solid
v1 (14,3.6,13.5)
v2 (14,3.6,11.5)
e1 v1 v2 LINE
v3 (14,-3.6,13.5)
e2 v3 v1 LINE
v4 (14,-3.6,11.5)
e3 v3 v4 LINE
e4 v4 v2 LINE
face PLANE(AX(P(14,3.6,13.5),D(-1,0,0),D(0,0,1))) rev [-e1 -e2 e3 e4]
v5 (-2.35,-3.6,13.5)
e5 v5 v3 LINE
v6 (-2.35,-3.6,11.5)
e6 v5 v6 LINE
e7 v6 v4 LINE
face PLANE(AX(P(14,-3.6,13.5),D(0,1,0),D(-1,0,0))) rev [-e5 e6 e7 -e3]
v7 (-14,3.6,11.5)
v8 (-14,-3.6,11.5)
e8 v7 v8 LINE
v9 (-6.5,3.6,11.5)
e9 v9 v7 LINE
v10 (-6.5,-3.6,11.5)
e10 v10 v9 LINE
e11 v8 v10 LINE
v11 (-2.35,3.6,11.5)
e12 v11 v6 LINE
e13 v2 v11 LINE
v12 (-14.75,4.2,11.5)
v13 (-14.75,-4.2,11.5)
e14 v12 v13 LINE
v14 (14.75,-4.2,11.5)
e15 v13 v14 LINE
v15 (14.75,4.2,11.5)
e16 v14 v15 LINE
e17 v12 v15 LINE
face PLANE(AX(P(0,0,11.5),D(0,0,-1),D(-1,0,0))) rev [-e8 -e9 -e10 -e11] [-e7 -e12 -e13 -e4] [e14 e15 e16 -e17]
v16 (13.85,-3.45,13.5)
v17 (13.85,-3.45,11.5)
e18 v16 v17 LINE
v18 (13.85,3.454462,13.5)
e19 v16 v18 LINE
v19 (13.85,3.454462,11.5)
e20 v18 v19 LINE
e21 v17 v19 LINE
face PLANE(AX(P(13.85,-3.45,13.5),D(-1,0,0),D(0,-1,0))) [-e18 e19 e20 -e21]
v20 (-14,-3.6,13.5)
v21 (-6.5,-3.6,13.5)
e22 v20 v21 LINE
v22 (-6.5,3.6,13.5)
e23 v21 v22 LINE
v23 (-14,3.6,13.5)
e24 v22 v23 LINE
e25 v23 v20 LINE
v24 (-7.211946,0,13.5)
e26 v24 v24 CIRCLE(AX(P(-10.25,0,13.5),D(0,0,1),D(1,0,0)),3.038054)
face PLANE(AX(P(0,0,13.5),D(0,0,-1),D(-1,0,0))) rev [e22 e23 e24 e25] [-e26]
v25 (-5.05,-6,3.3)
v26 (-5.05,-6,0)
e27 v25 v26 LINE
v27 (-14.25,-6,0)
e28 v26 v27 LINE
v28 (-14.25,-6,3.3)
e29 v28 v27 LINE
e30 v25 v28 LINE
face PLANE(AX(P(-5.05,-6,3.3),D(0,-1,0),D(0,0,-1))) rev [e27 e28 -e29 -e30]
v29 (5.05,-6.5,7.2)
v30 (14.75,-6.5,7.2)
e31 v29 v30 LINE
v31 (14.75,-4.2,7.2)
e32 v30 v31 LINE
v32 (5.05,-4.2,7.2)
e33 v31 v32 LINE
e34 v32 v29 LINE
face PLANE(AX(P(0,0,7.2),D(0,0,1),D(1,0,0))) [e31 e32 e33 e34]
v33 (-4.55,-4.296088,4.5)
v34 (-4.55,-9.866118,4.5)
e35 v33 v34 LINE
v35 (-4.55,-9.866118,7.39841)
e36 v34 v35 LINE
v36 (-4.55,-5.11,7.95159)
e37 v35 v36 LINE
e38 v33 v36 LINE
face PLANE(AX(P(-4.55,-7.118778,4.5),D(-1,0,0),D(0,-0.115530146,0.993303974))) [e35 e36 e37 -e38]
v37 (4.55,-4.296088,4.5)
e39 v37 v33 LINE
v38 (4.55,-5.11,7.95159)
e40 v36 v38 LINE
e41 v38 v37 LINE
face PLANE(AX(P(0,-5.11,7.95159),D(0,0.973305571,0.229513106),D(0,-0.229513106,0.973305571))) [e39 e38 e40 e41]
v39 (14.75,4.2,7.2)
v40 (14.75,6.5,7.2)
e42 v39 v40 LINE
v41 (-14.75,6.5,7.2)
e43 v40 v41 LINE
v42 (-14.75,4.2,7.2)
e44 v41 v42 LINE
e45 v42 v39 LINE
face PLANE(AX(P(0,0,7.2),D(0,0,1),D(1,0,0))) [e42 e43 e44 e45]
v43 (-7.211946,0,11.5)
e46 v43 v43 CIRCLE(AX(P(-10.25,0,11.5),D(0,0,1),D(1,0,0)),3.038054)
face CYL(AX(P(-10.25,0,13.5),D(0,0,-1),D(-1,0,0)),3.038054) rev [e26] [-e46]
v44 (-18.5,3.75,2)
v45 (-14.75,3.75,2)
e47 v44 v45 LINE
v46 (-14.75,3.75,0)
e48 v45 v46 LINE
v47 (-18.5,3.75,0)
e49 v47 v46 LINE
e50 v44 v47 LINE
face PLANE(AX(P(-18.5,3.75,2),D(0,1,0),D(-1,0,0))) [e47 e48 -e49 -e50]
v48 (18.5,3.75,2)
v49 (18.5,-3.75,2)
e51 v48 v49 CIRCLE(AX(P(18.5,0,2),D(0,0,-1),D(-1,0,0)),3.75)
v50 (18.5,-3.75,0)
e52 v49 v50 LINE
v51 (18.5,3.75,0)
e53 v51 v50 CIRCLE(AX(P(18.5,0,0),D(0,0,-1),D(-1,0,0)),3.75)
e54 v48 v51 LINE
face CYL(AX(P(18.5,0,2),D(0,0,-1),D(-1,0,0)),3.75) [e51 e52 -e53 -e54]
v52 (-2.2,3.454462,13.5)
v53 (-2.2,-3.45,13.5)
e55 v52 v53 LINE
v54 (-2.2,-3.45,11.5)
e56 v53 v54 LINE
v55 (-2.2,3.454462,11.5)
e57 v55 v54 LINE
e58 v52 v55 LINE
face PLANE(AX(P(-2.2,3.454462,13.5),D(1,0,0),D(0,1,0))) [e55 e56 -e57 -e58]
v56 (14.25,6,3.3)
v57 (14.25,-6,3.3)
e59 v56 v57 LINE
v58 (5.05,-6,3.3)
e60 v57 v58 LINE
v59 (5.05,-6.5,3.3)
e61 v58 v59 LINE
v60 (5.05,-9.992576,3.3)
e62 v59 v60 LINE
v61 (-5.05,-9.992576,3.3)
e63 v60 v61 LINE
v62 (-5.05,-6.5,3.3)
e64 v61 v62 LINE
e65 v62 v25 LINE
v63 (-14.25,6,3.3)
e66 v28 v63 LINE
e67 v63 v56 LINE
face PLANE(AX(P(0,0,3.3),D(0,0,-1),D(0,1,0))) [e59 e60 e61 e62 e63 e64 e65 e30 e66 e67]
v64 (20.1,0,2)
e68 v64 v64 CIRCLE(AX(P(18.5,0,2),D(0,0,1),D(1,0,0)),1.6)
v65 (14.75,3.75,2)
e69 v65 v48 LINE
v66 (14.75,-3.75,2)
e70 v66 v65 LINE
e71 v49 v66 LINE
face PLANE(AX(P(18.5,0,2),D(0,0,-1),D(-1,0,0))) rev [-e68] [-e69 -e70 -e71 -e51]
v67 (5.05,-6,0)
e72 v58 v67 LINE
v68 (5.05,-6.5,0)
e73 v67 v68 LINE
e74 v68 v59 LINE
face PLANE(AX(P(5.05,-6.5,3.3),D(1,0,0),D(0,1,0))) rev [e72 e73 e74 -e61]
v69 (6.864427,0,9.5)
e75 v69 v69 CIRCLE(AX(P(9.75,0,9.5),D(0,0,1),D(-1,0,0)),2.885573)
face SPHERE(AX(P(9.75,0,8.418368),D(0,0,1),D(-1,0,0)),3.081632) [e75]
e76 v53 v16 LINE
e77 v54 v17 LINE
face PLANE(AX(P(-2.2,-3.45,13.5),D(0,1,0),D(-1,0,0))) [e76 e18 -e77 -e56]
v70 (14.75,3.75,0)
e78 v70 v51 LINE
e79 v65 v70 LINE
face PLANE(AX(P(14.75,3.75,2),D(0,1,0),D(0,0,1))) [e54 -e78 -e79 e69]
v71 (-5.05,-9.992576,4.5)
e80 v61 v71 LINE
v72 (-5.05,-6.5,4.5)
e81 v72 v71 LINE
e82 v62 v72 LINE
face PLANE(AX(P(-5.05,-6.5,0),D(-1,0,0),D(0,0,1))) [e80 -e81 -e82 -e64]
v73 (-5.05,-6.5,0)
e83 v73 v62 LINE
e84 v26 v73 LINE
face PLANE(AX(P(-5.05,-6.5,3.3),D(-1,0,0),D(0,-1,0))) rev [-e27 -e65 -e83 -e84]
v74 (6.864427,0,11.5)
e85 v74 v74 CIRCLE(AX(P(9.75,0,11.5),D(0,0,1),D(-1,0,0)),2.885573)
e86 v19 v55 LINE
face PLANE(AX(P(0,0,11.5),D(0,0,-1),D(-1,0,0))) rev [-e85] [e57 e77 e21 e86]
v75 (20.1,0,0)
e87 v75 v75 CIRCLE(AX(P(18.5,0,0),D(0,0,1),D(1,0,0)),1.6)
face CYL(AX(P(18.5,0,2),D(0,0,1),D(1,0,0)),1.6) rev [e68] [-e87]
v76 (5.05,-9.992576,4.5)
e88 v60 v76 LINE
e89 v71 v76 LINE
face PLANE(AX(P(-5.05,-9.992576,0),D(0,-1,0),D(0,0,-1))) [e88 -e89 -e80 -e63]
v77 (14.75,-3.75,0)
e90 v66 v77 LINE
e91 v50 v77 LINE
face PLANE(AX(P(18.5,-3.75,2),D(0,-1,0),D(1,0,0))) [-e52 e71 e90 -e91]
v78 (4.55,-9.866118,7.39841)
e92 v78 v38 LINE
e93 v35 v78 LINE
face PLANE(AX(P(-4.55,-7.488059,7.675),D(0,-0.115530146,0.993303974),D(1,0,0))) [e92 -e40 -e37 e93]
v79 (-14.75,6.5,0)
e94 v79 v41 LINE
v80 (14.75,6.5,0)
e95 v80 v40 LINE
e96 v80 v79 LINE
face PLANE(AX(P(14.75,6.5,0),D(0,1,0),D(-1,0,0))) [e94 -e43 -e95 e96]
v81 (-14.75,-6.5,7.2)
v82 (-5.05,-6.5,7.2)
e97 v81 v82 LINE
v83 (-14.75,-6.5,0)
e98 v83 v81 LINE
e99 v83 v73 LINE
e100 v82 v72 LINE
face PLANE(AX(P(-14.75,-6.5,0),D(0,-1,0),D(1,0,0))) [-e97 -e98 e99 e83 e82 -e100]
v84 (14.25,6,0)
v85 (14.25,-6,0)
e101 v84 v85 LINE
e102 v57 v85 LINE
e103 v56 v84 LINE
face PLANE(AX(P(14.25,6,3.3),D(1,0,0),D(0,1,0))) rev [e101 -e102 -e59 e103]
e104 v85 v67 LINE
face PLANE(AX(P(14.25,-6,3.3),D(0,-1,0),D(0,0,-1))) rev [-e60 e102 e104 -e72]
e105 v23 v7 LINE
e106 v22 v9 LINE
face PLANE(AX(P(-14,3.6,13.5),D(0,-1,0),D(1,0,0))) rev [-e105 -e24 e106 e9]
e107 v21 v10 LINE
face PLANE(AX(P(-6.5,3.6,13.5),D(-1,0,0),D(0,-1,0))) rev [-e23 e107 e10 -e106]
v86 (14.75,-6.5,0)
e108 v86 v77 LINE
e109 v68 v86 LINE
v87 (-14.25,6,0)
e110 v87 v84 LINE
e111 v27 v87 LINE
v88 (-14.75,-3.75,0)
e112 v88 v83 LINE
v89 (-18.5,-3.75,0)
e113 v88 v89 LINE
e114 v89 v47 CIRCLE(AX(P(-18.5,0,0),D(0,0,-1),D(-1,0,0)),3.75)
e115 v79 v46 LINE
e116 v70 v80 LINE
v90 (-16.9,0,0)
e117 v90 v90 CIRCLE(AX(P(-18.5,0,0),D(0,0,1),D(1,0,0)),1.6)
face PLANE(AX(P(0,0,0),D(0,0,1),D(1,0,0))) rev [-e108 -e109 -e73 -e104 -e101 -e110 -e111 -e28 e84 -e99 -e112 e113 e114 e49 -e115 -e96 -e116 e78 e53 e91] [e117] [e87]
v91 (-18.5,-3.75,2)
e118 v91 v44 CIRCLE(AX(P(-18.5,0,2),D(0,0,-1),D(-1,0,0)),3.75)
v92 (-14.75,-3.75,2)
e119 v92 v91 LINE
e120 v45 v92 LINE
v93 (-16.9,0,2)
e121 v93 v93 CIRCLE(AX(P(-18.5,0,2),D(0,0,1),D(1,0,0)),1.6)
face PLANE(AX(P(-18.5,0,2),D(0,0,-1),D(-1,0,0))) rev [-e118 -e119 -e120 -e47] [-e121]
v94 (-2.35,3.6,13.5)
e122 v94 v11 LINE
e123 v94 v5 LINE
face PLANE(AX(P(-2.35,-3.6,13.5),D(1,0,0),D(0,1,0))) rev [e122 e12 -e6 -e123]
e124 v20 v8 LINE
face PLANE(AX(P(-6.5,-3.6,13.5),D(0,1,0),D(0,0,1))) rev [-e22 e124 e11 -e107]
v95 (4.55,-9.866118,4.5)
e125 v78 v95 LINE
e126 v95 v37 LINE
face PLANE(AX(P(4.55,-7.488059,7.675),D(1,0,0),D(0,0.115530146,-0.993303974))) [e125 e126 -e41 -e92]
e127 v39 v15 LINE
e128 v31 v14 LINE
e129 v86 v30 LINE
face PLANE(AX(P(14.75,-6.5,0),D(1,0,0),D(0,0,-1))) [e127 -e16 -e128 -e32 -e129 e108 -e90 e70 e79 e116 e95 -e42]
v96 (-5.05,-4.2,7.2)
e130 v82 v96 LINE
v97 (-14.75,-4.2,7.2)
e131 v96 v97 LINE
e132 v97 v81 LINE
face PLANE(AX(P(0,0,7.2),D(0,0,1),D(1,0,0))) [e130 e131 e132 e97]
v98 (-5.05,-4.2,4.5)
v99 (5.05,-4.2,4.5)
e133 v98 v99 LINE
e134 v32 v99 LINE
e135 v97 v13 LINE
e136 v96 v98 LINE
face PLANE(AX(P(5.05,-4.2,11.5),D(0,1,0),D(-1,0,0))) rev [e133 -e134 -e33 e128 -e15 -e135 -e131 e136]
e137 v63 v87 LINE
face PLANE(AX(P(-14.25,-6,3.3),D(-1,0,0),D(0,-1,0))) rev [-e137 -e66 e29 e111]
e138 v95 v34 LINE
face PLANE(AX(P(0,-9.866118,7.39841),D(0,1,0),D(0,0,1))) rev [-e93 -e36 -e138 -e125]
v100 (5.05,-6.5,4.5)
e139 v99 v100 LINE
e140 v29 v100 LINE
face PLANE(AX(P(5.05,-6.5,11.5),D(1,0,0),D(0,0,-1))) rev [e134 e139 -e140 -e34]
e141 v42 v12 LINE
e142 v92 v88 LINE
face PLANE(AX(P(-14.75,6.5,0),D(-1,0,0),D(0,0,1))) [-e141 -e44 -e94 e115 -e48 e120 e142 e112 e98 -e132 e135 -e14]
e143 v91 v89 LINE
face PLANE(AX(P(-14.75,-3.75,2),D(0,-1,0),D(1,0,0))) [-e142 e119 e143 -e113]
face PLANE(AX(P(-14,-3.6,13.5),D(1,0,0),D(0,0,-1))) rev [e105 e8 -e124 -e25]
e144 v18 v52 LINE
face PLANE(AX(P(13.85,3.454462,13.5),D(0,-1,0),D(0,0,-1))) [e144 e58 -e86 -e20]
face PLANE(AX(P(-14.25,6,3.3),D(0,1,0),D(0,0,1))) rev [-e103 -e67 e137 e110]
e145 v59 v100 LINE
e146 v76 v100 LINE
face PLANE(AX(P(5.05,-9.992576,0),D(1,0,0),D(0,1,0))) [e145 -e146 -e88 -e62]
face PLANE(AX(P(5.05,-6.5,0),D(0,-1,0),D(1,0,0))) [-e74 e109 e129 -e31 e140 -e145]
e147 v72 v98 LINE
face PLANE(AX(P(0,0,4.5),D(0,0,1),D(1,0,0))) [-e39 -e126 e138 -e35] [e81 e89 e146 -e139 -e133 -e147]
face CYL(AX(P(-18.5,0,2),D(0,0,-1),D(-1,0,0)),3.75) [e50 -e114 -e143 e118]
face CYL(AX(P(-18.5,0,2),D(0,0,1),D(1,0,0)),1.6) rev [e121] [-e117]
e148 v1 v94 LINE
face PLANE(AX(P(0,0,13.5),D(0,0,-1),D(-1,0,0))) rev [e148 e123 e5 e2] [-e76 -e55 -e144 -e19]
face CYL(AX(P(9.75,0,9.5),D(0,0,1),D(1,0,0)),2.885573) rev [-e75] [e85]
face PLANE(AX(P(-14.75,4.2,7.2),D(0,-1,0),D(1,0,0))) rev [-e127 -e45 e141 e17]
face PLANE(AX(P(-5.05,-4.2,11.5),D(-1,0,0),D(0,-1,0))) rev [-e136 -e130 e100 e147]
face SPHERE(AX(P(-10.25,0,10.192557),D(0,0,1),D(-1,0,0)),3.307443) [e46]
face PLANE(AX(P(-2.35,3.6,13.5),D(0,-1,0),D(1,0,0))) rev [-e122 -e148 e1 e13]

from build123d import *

# Parameters (mm, degrees)
ESTRUSIONE_ESTRUSIONE1_DEPTH = 4.5
NERVATURA1_START             = -4.55
NERVATURA1_DEPTH             = 9.1
ESTRUSIONE_ESTRUSIONE2_DEPTH = 7
TAGLIO_ESTRUSIONE1_DEPTH     = 3.3
ESTRUSIONE_ESTRUSIONE3_DEPTH = 2
FORO1_D                      = 3.2
FORO2_D                      = 3.2
SCHIZZO10_W                  = 29.5
SCHIZZO10_H                  = 2.3
SCHIZZO10_W_2                = 9.7
TAGLIO_ESTRUSIONE2_DEPTH     = 4.3
SCHIZZO11_W                  = 16.35
SCHIZZO11_H                  = 7.2
SCHIZZO11_W_2                = 16.05
SCHIZZO11_H_2                = 6.904461538
ESTRUSIONE_ESTRUSIONE4_DEPTH = 2
SCHIZZO12_R                  = 2.885572668
TAGLIO_ESTRUSIONE3_DEPTH     = 2
SCHIZZO15_W                  = 7.5
SCHIZZO15_H                  = 7.2
SCHIZZO15_R                  = 3.038054308
ESTRUSIONE_ESTRUSIONE5_DEPTH = 2


# Read off the part's stored shape, not the designer's step: Nervatura1
with BuildPart() as part:
    # Schizzo1 → Estrusione-Estrusione1 (new body)
    with BuildSketch(Plane.XY.offset(4.5)):
        Polygon((5.05, -9.992575631), (5.05, -6.5), (14.75, -6.5), (14.75, 6.5), (-14.75, 6.5), (-14.75, -6.5), (-5.05, -6.5), (-5.05, -9.992575631), align=None)
    extrude(amount=-ESTRUSIONE_ESTRUSIONE1_DEPTH)

    # Nervatura1 outline → Nervatura1 (add)
    with BuildSketch(Plane.YZ.offset(NERVATURA1_START)):
        Polygon((-4.296088186, 4.5), (-5.110000145, 7.951589572), (-9.866118458, 7.398410428), (-9.866118458, 4.5), align=None)
    extrude(amount=NERVATURA1_DEPTH)

    # Schizzo3 → Estrusione-Estrusione2 (add)
    with BuildSketch(Plane.XY.offset(4.5)):
        Polygon((-14.75, -6.5), (-14.75, 6.5), (14.75, 6.5), (14.75, -6.5), (5.05, -6.5), (5.05, -4.2), (-5.05, -4.2), (-5.05, -6.5), align=None)
    extrude(amount=ESTRUSIONE_ESTRUSIONE2_DEPTH)

    # Schizzo4 → Taglio-Estrusione1 (cut)
    with BuildSketch(Plane(origin=(0, 0, 0), x_dir=(-1, 0, 0), z_dir=(0, 0, -1))):
        Polygon((5.05, -9.992575631), (5.05, -6.5), (5.05, -6), (14.25, -6), (14.25, 6), (-14.25, 6), (-14.25, -6), (-5.05, -6), (-5.05, -6.5), (-5.05, -9.992575631), align=None)
    extrude(amount=-TAGLIO_ESTRUSIONE1_DEPTH, mode=Mode.SUBTRACT)

    # Schizzo5 → Estrusione-Estrusione3 (add)
    with BuildSketch(Plane(origin=(0, 0, 0), x_dir=(-1, 0, 0), z_dir=(0, 0, -1))):
        with BuildLine():
            Line((14.75, 3.75), (14.75, -3.75))
            Line((14.75, -3.75), (18.5, -3.75))
            ThreePointArc((18.5, -3.75), (22.25, 0), (18.5, 3.75))
            Line((18.5, 3.75), (14.75, 3.75))
        make_face()
        with BuildLine():
            Line((-14.75, -3.75), (-14.75, 3.75))
            Line((-14.75, 3.75), (-18.5, 3.75))
            ThreePointArc((-18.5, 3.75), (-22.25, 0), (-18.5, -3.75))
            Line((-18.5, -3.75), (-14.75, -3.75))
        make_face()
    extrude(amount=-ESTRUSIONE_ESTRUSIONE3_DEPTH)

    # Foro1 (through all)
    with Locations(Plane.XY.offset(2)):
        with Locations((18.5, 0)):
            Hole(FORO1_D / 2)

    # Foro2 (through all)
    with Locations(Plane.XY.offset(2)):
        with Locations((-18.5, 0)):
            Hole(FORO2_D / 2)

    # Schizzo10 → Taglio-Estrusione2 (cut)
    with BuildSketch(Plane.XY.offset(11.5)):
        with Locations((0, 5.35)):
            Rectangle(SCHIZZO10_W, SCHIZZO10_H)
        with Locations((9.9, -5.35)):
            Rectangle(SCHIZZO10_W_2, SCHIZZO10_H)
        with Locations((-9.9, -5.35)):
            Rectangle(SCHIZZO10_W_2, SCHIZZO10_H)
    extrude(amount=-TAGLIO_ESTRUSIONE2_DEPTH, mode=Mode.SUBTRACT)

    # Schizzo11 → Estrusione-Estrusione4 (add)
    with BuildSketch(Plane.XY.offset(11.5)):
        with Locations((5.825, 0)):
            Rectangle(SCHIZZO11_W, SCHIZZO11_H)
        with Locations((5.825, 0.002230769)):
            Rectangle(SCHIZZO11_W_2, SCHIZZO11_H_2, mode=Mode.SUBTRACT)
    extrude(amount=ESTRUSIONE_ESTRUSIONE4_DEPTH)

    # Schizzo12 → Taglio-Estrusione3 (cut)
    with BuildSketch(Plane.XY.offset(11.5)):
        with Locations(Location((9.75, 0, 0), (0, 0, 180))):
            Circle(SCHIZZO12_R)
    extrude(amount=-TAGLIO_ESTRUSIONE3_DEPTH, mode=Mode.SUBTRACT)

    # Schizzo13 → Rivoluzione1 (revolve)
    with BuildSketch(Plane(origin=(0, 0, 0), x_dir=(1, 0, 0), z_dir=(0, 1, 0)), mode=Mode.PRIVATE) as rivoluzione1_sk:
        with BuildLine():
            Line((12.635572668, -9.5), (9.75, -9.5))
            Line((9.75, -9.5), (9.75, -11.5))
            ThreePointArc((9.75, -11.5), (11.505457891, -10.951118249), (12.635572668, -9.5))
        make_face()
    revolve(rivoluzione1_sk.sketch.rotate(Axis((9.75, 0, 9.5), (0, 0, 1)), 180), axis=Axis((9.75, 0, 9.5), (0, 0, 1)))

    # Schizzo14 → Rivoluzione2 (revolve)
    with BuildSketch(Plane(origin=(0, 0, 0), x_dir=(1, 0, 0), z_dir=(0, 1, 0)), mode=Mode.PRIVATE) as rivoluzione2_sk:
        with BuildLine():
            Line((-7.211945692, -11.5), (-10.25, -11.5))
            Line((-10.25, -11.5), (-10.25, -13.5))
            ThreePointArc((-10.25, -13.5), (-8.431362187, -12.955116727), (-7.211945692, -11.5))
        make_face()
    revolve(rivoluzione2_sk.sketch.rotate(Axis((-10.25, 0, 11.5), (0, 0, 1)), 180), axis=Axis((-10.25, 0, 11.5), (0, 0, 1)))

    # Schizzo15 → Estrusione-Estrusione5 (add)
    with BuildSketch(Plane.XY.offset(11.5)):
        with Locations((-10.25, 0)):
            Rectangle(SCHIZZO15_W, SCHIZZO15_H)
        with Locations((-10.25, 0)):
            Circle(SCHIZZO15_R, mode=Mode.SUBTRACT)
    extrude(amount=ESTRUSIONE_ESTRUSIONE5_DEPTH)


solid = part.part
